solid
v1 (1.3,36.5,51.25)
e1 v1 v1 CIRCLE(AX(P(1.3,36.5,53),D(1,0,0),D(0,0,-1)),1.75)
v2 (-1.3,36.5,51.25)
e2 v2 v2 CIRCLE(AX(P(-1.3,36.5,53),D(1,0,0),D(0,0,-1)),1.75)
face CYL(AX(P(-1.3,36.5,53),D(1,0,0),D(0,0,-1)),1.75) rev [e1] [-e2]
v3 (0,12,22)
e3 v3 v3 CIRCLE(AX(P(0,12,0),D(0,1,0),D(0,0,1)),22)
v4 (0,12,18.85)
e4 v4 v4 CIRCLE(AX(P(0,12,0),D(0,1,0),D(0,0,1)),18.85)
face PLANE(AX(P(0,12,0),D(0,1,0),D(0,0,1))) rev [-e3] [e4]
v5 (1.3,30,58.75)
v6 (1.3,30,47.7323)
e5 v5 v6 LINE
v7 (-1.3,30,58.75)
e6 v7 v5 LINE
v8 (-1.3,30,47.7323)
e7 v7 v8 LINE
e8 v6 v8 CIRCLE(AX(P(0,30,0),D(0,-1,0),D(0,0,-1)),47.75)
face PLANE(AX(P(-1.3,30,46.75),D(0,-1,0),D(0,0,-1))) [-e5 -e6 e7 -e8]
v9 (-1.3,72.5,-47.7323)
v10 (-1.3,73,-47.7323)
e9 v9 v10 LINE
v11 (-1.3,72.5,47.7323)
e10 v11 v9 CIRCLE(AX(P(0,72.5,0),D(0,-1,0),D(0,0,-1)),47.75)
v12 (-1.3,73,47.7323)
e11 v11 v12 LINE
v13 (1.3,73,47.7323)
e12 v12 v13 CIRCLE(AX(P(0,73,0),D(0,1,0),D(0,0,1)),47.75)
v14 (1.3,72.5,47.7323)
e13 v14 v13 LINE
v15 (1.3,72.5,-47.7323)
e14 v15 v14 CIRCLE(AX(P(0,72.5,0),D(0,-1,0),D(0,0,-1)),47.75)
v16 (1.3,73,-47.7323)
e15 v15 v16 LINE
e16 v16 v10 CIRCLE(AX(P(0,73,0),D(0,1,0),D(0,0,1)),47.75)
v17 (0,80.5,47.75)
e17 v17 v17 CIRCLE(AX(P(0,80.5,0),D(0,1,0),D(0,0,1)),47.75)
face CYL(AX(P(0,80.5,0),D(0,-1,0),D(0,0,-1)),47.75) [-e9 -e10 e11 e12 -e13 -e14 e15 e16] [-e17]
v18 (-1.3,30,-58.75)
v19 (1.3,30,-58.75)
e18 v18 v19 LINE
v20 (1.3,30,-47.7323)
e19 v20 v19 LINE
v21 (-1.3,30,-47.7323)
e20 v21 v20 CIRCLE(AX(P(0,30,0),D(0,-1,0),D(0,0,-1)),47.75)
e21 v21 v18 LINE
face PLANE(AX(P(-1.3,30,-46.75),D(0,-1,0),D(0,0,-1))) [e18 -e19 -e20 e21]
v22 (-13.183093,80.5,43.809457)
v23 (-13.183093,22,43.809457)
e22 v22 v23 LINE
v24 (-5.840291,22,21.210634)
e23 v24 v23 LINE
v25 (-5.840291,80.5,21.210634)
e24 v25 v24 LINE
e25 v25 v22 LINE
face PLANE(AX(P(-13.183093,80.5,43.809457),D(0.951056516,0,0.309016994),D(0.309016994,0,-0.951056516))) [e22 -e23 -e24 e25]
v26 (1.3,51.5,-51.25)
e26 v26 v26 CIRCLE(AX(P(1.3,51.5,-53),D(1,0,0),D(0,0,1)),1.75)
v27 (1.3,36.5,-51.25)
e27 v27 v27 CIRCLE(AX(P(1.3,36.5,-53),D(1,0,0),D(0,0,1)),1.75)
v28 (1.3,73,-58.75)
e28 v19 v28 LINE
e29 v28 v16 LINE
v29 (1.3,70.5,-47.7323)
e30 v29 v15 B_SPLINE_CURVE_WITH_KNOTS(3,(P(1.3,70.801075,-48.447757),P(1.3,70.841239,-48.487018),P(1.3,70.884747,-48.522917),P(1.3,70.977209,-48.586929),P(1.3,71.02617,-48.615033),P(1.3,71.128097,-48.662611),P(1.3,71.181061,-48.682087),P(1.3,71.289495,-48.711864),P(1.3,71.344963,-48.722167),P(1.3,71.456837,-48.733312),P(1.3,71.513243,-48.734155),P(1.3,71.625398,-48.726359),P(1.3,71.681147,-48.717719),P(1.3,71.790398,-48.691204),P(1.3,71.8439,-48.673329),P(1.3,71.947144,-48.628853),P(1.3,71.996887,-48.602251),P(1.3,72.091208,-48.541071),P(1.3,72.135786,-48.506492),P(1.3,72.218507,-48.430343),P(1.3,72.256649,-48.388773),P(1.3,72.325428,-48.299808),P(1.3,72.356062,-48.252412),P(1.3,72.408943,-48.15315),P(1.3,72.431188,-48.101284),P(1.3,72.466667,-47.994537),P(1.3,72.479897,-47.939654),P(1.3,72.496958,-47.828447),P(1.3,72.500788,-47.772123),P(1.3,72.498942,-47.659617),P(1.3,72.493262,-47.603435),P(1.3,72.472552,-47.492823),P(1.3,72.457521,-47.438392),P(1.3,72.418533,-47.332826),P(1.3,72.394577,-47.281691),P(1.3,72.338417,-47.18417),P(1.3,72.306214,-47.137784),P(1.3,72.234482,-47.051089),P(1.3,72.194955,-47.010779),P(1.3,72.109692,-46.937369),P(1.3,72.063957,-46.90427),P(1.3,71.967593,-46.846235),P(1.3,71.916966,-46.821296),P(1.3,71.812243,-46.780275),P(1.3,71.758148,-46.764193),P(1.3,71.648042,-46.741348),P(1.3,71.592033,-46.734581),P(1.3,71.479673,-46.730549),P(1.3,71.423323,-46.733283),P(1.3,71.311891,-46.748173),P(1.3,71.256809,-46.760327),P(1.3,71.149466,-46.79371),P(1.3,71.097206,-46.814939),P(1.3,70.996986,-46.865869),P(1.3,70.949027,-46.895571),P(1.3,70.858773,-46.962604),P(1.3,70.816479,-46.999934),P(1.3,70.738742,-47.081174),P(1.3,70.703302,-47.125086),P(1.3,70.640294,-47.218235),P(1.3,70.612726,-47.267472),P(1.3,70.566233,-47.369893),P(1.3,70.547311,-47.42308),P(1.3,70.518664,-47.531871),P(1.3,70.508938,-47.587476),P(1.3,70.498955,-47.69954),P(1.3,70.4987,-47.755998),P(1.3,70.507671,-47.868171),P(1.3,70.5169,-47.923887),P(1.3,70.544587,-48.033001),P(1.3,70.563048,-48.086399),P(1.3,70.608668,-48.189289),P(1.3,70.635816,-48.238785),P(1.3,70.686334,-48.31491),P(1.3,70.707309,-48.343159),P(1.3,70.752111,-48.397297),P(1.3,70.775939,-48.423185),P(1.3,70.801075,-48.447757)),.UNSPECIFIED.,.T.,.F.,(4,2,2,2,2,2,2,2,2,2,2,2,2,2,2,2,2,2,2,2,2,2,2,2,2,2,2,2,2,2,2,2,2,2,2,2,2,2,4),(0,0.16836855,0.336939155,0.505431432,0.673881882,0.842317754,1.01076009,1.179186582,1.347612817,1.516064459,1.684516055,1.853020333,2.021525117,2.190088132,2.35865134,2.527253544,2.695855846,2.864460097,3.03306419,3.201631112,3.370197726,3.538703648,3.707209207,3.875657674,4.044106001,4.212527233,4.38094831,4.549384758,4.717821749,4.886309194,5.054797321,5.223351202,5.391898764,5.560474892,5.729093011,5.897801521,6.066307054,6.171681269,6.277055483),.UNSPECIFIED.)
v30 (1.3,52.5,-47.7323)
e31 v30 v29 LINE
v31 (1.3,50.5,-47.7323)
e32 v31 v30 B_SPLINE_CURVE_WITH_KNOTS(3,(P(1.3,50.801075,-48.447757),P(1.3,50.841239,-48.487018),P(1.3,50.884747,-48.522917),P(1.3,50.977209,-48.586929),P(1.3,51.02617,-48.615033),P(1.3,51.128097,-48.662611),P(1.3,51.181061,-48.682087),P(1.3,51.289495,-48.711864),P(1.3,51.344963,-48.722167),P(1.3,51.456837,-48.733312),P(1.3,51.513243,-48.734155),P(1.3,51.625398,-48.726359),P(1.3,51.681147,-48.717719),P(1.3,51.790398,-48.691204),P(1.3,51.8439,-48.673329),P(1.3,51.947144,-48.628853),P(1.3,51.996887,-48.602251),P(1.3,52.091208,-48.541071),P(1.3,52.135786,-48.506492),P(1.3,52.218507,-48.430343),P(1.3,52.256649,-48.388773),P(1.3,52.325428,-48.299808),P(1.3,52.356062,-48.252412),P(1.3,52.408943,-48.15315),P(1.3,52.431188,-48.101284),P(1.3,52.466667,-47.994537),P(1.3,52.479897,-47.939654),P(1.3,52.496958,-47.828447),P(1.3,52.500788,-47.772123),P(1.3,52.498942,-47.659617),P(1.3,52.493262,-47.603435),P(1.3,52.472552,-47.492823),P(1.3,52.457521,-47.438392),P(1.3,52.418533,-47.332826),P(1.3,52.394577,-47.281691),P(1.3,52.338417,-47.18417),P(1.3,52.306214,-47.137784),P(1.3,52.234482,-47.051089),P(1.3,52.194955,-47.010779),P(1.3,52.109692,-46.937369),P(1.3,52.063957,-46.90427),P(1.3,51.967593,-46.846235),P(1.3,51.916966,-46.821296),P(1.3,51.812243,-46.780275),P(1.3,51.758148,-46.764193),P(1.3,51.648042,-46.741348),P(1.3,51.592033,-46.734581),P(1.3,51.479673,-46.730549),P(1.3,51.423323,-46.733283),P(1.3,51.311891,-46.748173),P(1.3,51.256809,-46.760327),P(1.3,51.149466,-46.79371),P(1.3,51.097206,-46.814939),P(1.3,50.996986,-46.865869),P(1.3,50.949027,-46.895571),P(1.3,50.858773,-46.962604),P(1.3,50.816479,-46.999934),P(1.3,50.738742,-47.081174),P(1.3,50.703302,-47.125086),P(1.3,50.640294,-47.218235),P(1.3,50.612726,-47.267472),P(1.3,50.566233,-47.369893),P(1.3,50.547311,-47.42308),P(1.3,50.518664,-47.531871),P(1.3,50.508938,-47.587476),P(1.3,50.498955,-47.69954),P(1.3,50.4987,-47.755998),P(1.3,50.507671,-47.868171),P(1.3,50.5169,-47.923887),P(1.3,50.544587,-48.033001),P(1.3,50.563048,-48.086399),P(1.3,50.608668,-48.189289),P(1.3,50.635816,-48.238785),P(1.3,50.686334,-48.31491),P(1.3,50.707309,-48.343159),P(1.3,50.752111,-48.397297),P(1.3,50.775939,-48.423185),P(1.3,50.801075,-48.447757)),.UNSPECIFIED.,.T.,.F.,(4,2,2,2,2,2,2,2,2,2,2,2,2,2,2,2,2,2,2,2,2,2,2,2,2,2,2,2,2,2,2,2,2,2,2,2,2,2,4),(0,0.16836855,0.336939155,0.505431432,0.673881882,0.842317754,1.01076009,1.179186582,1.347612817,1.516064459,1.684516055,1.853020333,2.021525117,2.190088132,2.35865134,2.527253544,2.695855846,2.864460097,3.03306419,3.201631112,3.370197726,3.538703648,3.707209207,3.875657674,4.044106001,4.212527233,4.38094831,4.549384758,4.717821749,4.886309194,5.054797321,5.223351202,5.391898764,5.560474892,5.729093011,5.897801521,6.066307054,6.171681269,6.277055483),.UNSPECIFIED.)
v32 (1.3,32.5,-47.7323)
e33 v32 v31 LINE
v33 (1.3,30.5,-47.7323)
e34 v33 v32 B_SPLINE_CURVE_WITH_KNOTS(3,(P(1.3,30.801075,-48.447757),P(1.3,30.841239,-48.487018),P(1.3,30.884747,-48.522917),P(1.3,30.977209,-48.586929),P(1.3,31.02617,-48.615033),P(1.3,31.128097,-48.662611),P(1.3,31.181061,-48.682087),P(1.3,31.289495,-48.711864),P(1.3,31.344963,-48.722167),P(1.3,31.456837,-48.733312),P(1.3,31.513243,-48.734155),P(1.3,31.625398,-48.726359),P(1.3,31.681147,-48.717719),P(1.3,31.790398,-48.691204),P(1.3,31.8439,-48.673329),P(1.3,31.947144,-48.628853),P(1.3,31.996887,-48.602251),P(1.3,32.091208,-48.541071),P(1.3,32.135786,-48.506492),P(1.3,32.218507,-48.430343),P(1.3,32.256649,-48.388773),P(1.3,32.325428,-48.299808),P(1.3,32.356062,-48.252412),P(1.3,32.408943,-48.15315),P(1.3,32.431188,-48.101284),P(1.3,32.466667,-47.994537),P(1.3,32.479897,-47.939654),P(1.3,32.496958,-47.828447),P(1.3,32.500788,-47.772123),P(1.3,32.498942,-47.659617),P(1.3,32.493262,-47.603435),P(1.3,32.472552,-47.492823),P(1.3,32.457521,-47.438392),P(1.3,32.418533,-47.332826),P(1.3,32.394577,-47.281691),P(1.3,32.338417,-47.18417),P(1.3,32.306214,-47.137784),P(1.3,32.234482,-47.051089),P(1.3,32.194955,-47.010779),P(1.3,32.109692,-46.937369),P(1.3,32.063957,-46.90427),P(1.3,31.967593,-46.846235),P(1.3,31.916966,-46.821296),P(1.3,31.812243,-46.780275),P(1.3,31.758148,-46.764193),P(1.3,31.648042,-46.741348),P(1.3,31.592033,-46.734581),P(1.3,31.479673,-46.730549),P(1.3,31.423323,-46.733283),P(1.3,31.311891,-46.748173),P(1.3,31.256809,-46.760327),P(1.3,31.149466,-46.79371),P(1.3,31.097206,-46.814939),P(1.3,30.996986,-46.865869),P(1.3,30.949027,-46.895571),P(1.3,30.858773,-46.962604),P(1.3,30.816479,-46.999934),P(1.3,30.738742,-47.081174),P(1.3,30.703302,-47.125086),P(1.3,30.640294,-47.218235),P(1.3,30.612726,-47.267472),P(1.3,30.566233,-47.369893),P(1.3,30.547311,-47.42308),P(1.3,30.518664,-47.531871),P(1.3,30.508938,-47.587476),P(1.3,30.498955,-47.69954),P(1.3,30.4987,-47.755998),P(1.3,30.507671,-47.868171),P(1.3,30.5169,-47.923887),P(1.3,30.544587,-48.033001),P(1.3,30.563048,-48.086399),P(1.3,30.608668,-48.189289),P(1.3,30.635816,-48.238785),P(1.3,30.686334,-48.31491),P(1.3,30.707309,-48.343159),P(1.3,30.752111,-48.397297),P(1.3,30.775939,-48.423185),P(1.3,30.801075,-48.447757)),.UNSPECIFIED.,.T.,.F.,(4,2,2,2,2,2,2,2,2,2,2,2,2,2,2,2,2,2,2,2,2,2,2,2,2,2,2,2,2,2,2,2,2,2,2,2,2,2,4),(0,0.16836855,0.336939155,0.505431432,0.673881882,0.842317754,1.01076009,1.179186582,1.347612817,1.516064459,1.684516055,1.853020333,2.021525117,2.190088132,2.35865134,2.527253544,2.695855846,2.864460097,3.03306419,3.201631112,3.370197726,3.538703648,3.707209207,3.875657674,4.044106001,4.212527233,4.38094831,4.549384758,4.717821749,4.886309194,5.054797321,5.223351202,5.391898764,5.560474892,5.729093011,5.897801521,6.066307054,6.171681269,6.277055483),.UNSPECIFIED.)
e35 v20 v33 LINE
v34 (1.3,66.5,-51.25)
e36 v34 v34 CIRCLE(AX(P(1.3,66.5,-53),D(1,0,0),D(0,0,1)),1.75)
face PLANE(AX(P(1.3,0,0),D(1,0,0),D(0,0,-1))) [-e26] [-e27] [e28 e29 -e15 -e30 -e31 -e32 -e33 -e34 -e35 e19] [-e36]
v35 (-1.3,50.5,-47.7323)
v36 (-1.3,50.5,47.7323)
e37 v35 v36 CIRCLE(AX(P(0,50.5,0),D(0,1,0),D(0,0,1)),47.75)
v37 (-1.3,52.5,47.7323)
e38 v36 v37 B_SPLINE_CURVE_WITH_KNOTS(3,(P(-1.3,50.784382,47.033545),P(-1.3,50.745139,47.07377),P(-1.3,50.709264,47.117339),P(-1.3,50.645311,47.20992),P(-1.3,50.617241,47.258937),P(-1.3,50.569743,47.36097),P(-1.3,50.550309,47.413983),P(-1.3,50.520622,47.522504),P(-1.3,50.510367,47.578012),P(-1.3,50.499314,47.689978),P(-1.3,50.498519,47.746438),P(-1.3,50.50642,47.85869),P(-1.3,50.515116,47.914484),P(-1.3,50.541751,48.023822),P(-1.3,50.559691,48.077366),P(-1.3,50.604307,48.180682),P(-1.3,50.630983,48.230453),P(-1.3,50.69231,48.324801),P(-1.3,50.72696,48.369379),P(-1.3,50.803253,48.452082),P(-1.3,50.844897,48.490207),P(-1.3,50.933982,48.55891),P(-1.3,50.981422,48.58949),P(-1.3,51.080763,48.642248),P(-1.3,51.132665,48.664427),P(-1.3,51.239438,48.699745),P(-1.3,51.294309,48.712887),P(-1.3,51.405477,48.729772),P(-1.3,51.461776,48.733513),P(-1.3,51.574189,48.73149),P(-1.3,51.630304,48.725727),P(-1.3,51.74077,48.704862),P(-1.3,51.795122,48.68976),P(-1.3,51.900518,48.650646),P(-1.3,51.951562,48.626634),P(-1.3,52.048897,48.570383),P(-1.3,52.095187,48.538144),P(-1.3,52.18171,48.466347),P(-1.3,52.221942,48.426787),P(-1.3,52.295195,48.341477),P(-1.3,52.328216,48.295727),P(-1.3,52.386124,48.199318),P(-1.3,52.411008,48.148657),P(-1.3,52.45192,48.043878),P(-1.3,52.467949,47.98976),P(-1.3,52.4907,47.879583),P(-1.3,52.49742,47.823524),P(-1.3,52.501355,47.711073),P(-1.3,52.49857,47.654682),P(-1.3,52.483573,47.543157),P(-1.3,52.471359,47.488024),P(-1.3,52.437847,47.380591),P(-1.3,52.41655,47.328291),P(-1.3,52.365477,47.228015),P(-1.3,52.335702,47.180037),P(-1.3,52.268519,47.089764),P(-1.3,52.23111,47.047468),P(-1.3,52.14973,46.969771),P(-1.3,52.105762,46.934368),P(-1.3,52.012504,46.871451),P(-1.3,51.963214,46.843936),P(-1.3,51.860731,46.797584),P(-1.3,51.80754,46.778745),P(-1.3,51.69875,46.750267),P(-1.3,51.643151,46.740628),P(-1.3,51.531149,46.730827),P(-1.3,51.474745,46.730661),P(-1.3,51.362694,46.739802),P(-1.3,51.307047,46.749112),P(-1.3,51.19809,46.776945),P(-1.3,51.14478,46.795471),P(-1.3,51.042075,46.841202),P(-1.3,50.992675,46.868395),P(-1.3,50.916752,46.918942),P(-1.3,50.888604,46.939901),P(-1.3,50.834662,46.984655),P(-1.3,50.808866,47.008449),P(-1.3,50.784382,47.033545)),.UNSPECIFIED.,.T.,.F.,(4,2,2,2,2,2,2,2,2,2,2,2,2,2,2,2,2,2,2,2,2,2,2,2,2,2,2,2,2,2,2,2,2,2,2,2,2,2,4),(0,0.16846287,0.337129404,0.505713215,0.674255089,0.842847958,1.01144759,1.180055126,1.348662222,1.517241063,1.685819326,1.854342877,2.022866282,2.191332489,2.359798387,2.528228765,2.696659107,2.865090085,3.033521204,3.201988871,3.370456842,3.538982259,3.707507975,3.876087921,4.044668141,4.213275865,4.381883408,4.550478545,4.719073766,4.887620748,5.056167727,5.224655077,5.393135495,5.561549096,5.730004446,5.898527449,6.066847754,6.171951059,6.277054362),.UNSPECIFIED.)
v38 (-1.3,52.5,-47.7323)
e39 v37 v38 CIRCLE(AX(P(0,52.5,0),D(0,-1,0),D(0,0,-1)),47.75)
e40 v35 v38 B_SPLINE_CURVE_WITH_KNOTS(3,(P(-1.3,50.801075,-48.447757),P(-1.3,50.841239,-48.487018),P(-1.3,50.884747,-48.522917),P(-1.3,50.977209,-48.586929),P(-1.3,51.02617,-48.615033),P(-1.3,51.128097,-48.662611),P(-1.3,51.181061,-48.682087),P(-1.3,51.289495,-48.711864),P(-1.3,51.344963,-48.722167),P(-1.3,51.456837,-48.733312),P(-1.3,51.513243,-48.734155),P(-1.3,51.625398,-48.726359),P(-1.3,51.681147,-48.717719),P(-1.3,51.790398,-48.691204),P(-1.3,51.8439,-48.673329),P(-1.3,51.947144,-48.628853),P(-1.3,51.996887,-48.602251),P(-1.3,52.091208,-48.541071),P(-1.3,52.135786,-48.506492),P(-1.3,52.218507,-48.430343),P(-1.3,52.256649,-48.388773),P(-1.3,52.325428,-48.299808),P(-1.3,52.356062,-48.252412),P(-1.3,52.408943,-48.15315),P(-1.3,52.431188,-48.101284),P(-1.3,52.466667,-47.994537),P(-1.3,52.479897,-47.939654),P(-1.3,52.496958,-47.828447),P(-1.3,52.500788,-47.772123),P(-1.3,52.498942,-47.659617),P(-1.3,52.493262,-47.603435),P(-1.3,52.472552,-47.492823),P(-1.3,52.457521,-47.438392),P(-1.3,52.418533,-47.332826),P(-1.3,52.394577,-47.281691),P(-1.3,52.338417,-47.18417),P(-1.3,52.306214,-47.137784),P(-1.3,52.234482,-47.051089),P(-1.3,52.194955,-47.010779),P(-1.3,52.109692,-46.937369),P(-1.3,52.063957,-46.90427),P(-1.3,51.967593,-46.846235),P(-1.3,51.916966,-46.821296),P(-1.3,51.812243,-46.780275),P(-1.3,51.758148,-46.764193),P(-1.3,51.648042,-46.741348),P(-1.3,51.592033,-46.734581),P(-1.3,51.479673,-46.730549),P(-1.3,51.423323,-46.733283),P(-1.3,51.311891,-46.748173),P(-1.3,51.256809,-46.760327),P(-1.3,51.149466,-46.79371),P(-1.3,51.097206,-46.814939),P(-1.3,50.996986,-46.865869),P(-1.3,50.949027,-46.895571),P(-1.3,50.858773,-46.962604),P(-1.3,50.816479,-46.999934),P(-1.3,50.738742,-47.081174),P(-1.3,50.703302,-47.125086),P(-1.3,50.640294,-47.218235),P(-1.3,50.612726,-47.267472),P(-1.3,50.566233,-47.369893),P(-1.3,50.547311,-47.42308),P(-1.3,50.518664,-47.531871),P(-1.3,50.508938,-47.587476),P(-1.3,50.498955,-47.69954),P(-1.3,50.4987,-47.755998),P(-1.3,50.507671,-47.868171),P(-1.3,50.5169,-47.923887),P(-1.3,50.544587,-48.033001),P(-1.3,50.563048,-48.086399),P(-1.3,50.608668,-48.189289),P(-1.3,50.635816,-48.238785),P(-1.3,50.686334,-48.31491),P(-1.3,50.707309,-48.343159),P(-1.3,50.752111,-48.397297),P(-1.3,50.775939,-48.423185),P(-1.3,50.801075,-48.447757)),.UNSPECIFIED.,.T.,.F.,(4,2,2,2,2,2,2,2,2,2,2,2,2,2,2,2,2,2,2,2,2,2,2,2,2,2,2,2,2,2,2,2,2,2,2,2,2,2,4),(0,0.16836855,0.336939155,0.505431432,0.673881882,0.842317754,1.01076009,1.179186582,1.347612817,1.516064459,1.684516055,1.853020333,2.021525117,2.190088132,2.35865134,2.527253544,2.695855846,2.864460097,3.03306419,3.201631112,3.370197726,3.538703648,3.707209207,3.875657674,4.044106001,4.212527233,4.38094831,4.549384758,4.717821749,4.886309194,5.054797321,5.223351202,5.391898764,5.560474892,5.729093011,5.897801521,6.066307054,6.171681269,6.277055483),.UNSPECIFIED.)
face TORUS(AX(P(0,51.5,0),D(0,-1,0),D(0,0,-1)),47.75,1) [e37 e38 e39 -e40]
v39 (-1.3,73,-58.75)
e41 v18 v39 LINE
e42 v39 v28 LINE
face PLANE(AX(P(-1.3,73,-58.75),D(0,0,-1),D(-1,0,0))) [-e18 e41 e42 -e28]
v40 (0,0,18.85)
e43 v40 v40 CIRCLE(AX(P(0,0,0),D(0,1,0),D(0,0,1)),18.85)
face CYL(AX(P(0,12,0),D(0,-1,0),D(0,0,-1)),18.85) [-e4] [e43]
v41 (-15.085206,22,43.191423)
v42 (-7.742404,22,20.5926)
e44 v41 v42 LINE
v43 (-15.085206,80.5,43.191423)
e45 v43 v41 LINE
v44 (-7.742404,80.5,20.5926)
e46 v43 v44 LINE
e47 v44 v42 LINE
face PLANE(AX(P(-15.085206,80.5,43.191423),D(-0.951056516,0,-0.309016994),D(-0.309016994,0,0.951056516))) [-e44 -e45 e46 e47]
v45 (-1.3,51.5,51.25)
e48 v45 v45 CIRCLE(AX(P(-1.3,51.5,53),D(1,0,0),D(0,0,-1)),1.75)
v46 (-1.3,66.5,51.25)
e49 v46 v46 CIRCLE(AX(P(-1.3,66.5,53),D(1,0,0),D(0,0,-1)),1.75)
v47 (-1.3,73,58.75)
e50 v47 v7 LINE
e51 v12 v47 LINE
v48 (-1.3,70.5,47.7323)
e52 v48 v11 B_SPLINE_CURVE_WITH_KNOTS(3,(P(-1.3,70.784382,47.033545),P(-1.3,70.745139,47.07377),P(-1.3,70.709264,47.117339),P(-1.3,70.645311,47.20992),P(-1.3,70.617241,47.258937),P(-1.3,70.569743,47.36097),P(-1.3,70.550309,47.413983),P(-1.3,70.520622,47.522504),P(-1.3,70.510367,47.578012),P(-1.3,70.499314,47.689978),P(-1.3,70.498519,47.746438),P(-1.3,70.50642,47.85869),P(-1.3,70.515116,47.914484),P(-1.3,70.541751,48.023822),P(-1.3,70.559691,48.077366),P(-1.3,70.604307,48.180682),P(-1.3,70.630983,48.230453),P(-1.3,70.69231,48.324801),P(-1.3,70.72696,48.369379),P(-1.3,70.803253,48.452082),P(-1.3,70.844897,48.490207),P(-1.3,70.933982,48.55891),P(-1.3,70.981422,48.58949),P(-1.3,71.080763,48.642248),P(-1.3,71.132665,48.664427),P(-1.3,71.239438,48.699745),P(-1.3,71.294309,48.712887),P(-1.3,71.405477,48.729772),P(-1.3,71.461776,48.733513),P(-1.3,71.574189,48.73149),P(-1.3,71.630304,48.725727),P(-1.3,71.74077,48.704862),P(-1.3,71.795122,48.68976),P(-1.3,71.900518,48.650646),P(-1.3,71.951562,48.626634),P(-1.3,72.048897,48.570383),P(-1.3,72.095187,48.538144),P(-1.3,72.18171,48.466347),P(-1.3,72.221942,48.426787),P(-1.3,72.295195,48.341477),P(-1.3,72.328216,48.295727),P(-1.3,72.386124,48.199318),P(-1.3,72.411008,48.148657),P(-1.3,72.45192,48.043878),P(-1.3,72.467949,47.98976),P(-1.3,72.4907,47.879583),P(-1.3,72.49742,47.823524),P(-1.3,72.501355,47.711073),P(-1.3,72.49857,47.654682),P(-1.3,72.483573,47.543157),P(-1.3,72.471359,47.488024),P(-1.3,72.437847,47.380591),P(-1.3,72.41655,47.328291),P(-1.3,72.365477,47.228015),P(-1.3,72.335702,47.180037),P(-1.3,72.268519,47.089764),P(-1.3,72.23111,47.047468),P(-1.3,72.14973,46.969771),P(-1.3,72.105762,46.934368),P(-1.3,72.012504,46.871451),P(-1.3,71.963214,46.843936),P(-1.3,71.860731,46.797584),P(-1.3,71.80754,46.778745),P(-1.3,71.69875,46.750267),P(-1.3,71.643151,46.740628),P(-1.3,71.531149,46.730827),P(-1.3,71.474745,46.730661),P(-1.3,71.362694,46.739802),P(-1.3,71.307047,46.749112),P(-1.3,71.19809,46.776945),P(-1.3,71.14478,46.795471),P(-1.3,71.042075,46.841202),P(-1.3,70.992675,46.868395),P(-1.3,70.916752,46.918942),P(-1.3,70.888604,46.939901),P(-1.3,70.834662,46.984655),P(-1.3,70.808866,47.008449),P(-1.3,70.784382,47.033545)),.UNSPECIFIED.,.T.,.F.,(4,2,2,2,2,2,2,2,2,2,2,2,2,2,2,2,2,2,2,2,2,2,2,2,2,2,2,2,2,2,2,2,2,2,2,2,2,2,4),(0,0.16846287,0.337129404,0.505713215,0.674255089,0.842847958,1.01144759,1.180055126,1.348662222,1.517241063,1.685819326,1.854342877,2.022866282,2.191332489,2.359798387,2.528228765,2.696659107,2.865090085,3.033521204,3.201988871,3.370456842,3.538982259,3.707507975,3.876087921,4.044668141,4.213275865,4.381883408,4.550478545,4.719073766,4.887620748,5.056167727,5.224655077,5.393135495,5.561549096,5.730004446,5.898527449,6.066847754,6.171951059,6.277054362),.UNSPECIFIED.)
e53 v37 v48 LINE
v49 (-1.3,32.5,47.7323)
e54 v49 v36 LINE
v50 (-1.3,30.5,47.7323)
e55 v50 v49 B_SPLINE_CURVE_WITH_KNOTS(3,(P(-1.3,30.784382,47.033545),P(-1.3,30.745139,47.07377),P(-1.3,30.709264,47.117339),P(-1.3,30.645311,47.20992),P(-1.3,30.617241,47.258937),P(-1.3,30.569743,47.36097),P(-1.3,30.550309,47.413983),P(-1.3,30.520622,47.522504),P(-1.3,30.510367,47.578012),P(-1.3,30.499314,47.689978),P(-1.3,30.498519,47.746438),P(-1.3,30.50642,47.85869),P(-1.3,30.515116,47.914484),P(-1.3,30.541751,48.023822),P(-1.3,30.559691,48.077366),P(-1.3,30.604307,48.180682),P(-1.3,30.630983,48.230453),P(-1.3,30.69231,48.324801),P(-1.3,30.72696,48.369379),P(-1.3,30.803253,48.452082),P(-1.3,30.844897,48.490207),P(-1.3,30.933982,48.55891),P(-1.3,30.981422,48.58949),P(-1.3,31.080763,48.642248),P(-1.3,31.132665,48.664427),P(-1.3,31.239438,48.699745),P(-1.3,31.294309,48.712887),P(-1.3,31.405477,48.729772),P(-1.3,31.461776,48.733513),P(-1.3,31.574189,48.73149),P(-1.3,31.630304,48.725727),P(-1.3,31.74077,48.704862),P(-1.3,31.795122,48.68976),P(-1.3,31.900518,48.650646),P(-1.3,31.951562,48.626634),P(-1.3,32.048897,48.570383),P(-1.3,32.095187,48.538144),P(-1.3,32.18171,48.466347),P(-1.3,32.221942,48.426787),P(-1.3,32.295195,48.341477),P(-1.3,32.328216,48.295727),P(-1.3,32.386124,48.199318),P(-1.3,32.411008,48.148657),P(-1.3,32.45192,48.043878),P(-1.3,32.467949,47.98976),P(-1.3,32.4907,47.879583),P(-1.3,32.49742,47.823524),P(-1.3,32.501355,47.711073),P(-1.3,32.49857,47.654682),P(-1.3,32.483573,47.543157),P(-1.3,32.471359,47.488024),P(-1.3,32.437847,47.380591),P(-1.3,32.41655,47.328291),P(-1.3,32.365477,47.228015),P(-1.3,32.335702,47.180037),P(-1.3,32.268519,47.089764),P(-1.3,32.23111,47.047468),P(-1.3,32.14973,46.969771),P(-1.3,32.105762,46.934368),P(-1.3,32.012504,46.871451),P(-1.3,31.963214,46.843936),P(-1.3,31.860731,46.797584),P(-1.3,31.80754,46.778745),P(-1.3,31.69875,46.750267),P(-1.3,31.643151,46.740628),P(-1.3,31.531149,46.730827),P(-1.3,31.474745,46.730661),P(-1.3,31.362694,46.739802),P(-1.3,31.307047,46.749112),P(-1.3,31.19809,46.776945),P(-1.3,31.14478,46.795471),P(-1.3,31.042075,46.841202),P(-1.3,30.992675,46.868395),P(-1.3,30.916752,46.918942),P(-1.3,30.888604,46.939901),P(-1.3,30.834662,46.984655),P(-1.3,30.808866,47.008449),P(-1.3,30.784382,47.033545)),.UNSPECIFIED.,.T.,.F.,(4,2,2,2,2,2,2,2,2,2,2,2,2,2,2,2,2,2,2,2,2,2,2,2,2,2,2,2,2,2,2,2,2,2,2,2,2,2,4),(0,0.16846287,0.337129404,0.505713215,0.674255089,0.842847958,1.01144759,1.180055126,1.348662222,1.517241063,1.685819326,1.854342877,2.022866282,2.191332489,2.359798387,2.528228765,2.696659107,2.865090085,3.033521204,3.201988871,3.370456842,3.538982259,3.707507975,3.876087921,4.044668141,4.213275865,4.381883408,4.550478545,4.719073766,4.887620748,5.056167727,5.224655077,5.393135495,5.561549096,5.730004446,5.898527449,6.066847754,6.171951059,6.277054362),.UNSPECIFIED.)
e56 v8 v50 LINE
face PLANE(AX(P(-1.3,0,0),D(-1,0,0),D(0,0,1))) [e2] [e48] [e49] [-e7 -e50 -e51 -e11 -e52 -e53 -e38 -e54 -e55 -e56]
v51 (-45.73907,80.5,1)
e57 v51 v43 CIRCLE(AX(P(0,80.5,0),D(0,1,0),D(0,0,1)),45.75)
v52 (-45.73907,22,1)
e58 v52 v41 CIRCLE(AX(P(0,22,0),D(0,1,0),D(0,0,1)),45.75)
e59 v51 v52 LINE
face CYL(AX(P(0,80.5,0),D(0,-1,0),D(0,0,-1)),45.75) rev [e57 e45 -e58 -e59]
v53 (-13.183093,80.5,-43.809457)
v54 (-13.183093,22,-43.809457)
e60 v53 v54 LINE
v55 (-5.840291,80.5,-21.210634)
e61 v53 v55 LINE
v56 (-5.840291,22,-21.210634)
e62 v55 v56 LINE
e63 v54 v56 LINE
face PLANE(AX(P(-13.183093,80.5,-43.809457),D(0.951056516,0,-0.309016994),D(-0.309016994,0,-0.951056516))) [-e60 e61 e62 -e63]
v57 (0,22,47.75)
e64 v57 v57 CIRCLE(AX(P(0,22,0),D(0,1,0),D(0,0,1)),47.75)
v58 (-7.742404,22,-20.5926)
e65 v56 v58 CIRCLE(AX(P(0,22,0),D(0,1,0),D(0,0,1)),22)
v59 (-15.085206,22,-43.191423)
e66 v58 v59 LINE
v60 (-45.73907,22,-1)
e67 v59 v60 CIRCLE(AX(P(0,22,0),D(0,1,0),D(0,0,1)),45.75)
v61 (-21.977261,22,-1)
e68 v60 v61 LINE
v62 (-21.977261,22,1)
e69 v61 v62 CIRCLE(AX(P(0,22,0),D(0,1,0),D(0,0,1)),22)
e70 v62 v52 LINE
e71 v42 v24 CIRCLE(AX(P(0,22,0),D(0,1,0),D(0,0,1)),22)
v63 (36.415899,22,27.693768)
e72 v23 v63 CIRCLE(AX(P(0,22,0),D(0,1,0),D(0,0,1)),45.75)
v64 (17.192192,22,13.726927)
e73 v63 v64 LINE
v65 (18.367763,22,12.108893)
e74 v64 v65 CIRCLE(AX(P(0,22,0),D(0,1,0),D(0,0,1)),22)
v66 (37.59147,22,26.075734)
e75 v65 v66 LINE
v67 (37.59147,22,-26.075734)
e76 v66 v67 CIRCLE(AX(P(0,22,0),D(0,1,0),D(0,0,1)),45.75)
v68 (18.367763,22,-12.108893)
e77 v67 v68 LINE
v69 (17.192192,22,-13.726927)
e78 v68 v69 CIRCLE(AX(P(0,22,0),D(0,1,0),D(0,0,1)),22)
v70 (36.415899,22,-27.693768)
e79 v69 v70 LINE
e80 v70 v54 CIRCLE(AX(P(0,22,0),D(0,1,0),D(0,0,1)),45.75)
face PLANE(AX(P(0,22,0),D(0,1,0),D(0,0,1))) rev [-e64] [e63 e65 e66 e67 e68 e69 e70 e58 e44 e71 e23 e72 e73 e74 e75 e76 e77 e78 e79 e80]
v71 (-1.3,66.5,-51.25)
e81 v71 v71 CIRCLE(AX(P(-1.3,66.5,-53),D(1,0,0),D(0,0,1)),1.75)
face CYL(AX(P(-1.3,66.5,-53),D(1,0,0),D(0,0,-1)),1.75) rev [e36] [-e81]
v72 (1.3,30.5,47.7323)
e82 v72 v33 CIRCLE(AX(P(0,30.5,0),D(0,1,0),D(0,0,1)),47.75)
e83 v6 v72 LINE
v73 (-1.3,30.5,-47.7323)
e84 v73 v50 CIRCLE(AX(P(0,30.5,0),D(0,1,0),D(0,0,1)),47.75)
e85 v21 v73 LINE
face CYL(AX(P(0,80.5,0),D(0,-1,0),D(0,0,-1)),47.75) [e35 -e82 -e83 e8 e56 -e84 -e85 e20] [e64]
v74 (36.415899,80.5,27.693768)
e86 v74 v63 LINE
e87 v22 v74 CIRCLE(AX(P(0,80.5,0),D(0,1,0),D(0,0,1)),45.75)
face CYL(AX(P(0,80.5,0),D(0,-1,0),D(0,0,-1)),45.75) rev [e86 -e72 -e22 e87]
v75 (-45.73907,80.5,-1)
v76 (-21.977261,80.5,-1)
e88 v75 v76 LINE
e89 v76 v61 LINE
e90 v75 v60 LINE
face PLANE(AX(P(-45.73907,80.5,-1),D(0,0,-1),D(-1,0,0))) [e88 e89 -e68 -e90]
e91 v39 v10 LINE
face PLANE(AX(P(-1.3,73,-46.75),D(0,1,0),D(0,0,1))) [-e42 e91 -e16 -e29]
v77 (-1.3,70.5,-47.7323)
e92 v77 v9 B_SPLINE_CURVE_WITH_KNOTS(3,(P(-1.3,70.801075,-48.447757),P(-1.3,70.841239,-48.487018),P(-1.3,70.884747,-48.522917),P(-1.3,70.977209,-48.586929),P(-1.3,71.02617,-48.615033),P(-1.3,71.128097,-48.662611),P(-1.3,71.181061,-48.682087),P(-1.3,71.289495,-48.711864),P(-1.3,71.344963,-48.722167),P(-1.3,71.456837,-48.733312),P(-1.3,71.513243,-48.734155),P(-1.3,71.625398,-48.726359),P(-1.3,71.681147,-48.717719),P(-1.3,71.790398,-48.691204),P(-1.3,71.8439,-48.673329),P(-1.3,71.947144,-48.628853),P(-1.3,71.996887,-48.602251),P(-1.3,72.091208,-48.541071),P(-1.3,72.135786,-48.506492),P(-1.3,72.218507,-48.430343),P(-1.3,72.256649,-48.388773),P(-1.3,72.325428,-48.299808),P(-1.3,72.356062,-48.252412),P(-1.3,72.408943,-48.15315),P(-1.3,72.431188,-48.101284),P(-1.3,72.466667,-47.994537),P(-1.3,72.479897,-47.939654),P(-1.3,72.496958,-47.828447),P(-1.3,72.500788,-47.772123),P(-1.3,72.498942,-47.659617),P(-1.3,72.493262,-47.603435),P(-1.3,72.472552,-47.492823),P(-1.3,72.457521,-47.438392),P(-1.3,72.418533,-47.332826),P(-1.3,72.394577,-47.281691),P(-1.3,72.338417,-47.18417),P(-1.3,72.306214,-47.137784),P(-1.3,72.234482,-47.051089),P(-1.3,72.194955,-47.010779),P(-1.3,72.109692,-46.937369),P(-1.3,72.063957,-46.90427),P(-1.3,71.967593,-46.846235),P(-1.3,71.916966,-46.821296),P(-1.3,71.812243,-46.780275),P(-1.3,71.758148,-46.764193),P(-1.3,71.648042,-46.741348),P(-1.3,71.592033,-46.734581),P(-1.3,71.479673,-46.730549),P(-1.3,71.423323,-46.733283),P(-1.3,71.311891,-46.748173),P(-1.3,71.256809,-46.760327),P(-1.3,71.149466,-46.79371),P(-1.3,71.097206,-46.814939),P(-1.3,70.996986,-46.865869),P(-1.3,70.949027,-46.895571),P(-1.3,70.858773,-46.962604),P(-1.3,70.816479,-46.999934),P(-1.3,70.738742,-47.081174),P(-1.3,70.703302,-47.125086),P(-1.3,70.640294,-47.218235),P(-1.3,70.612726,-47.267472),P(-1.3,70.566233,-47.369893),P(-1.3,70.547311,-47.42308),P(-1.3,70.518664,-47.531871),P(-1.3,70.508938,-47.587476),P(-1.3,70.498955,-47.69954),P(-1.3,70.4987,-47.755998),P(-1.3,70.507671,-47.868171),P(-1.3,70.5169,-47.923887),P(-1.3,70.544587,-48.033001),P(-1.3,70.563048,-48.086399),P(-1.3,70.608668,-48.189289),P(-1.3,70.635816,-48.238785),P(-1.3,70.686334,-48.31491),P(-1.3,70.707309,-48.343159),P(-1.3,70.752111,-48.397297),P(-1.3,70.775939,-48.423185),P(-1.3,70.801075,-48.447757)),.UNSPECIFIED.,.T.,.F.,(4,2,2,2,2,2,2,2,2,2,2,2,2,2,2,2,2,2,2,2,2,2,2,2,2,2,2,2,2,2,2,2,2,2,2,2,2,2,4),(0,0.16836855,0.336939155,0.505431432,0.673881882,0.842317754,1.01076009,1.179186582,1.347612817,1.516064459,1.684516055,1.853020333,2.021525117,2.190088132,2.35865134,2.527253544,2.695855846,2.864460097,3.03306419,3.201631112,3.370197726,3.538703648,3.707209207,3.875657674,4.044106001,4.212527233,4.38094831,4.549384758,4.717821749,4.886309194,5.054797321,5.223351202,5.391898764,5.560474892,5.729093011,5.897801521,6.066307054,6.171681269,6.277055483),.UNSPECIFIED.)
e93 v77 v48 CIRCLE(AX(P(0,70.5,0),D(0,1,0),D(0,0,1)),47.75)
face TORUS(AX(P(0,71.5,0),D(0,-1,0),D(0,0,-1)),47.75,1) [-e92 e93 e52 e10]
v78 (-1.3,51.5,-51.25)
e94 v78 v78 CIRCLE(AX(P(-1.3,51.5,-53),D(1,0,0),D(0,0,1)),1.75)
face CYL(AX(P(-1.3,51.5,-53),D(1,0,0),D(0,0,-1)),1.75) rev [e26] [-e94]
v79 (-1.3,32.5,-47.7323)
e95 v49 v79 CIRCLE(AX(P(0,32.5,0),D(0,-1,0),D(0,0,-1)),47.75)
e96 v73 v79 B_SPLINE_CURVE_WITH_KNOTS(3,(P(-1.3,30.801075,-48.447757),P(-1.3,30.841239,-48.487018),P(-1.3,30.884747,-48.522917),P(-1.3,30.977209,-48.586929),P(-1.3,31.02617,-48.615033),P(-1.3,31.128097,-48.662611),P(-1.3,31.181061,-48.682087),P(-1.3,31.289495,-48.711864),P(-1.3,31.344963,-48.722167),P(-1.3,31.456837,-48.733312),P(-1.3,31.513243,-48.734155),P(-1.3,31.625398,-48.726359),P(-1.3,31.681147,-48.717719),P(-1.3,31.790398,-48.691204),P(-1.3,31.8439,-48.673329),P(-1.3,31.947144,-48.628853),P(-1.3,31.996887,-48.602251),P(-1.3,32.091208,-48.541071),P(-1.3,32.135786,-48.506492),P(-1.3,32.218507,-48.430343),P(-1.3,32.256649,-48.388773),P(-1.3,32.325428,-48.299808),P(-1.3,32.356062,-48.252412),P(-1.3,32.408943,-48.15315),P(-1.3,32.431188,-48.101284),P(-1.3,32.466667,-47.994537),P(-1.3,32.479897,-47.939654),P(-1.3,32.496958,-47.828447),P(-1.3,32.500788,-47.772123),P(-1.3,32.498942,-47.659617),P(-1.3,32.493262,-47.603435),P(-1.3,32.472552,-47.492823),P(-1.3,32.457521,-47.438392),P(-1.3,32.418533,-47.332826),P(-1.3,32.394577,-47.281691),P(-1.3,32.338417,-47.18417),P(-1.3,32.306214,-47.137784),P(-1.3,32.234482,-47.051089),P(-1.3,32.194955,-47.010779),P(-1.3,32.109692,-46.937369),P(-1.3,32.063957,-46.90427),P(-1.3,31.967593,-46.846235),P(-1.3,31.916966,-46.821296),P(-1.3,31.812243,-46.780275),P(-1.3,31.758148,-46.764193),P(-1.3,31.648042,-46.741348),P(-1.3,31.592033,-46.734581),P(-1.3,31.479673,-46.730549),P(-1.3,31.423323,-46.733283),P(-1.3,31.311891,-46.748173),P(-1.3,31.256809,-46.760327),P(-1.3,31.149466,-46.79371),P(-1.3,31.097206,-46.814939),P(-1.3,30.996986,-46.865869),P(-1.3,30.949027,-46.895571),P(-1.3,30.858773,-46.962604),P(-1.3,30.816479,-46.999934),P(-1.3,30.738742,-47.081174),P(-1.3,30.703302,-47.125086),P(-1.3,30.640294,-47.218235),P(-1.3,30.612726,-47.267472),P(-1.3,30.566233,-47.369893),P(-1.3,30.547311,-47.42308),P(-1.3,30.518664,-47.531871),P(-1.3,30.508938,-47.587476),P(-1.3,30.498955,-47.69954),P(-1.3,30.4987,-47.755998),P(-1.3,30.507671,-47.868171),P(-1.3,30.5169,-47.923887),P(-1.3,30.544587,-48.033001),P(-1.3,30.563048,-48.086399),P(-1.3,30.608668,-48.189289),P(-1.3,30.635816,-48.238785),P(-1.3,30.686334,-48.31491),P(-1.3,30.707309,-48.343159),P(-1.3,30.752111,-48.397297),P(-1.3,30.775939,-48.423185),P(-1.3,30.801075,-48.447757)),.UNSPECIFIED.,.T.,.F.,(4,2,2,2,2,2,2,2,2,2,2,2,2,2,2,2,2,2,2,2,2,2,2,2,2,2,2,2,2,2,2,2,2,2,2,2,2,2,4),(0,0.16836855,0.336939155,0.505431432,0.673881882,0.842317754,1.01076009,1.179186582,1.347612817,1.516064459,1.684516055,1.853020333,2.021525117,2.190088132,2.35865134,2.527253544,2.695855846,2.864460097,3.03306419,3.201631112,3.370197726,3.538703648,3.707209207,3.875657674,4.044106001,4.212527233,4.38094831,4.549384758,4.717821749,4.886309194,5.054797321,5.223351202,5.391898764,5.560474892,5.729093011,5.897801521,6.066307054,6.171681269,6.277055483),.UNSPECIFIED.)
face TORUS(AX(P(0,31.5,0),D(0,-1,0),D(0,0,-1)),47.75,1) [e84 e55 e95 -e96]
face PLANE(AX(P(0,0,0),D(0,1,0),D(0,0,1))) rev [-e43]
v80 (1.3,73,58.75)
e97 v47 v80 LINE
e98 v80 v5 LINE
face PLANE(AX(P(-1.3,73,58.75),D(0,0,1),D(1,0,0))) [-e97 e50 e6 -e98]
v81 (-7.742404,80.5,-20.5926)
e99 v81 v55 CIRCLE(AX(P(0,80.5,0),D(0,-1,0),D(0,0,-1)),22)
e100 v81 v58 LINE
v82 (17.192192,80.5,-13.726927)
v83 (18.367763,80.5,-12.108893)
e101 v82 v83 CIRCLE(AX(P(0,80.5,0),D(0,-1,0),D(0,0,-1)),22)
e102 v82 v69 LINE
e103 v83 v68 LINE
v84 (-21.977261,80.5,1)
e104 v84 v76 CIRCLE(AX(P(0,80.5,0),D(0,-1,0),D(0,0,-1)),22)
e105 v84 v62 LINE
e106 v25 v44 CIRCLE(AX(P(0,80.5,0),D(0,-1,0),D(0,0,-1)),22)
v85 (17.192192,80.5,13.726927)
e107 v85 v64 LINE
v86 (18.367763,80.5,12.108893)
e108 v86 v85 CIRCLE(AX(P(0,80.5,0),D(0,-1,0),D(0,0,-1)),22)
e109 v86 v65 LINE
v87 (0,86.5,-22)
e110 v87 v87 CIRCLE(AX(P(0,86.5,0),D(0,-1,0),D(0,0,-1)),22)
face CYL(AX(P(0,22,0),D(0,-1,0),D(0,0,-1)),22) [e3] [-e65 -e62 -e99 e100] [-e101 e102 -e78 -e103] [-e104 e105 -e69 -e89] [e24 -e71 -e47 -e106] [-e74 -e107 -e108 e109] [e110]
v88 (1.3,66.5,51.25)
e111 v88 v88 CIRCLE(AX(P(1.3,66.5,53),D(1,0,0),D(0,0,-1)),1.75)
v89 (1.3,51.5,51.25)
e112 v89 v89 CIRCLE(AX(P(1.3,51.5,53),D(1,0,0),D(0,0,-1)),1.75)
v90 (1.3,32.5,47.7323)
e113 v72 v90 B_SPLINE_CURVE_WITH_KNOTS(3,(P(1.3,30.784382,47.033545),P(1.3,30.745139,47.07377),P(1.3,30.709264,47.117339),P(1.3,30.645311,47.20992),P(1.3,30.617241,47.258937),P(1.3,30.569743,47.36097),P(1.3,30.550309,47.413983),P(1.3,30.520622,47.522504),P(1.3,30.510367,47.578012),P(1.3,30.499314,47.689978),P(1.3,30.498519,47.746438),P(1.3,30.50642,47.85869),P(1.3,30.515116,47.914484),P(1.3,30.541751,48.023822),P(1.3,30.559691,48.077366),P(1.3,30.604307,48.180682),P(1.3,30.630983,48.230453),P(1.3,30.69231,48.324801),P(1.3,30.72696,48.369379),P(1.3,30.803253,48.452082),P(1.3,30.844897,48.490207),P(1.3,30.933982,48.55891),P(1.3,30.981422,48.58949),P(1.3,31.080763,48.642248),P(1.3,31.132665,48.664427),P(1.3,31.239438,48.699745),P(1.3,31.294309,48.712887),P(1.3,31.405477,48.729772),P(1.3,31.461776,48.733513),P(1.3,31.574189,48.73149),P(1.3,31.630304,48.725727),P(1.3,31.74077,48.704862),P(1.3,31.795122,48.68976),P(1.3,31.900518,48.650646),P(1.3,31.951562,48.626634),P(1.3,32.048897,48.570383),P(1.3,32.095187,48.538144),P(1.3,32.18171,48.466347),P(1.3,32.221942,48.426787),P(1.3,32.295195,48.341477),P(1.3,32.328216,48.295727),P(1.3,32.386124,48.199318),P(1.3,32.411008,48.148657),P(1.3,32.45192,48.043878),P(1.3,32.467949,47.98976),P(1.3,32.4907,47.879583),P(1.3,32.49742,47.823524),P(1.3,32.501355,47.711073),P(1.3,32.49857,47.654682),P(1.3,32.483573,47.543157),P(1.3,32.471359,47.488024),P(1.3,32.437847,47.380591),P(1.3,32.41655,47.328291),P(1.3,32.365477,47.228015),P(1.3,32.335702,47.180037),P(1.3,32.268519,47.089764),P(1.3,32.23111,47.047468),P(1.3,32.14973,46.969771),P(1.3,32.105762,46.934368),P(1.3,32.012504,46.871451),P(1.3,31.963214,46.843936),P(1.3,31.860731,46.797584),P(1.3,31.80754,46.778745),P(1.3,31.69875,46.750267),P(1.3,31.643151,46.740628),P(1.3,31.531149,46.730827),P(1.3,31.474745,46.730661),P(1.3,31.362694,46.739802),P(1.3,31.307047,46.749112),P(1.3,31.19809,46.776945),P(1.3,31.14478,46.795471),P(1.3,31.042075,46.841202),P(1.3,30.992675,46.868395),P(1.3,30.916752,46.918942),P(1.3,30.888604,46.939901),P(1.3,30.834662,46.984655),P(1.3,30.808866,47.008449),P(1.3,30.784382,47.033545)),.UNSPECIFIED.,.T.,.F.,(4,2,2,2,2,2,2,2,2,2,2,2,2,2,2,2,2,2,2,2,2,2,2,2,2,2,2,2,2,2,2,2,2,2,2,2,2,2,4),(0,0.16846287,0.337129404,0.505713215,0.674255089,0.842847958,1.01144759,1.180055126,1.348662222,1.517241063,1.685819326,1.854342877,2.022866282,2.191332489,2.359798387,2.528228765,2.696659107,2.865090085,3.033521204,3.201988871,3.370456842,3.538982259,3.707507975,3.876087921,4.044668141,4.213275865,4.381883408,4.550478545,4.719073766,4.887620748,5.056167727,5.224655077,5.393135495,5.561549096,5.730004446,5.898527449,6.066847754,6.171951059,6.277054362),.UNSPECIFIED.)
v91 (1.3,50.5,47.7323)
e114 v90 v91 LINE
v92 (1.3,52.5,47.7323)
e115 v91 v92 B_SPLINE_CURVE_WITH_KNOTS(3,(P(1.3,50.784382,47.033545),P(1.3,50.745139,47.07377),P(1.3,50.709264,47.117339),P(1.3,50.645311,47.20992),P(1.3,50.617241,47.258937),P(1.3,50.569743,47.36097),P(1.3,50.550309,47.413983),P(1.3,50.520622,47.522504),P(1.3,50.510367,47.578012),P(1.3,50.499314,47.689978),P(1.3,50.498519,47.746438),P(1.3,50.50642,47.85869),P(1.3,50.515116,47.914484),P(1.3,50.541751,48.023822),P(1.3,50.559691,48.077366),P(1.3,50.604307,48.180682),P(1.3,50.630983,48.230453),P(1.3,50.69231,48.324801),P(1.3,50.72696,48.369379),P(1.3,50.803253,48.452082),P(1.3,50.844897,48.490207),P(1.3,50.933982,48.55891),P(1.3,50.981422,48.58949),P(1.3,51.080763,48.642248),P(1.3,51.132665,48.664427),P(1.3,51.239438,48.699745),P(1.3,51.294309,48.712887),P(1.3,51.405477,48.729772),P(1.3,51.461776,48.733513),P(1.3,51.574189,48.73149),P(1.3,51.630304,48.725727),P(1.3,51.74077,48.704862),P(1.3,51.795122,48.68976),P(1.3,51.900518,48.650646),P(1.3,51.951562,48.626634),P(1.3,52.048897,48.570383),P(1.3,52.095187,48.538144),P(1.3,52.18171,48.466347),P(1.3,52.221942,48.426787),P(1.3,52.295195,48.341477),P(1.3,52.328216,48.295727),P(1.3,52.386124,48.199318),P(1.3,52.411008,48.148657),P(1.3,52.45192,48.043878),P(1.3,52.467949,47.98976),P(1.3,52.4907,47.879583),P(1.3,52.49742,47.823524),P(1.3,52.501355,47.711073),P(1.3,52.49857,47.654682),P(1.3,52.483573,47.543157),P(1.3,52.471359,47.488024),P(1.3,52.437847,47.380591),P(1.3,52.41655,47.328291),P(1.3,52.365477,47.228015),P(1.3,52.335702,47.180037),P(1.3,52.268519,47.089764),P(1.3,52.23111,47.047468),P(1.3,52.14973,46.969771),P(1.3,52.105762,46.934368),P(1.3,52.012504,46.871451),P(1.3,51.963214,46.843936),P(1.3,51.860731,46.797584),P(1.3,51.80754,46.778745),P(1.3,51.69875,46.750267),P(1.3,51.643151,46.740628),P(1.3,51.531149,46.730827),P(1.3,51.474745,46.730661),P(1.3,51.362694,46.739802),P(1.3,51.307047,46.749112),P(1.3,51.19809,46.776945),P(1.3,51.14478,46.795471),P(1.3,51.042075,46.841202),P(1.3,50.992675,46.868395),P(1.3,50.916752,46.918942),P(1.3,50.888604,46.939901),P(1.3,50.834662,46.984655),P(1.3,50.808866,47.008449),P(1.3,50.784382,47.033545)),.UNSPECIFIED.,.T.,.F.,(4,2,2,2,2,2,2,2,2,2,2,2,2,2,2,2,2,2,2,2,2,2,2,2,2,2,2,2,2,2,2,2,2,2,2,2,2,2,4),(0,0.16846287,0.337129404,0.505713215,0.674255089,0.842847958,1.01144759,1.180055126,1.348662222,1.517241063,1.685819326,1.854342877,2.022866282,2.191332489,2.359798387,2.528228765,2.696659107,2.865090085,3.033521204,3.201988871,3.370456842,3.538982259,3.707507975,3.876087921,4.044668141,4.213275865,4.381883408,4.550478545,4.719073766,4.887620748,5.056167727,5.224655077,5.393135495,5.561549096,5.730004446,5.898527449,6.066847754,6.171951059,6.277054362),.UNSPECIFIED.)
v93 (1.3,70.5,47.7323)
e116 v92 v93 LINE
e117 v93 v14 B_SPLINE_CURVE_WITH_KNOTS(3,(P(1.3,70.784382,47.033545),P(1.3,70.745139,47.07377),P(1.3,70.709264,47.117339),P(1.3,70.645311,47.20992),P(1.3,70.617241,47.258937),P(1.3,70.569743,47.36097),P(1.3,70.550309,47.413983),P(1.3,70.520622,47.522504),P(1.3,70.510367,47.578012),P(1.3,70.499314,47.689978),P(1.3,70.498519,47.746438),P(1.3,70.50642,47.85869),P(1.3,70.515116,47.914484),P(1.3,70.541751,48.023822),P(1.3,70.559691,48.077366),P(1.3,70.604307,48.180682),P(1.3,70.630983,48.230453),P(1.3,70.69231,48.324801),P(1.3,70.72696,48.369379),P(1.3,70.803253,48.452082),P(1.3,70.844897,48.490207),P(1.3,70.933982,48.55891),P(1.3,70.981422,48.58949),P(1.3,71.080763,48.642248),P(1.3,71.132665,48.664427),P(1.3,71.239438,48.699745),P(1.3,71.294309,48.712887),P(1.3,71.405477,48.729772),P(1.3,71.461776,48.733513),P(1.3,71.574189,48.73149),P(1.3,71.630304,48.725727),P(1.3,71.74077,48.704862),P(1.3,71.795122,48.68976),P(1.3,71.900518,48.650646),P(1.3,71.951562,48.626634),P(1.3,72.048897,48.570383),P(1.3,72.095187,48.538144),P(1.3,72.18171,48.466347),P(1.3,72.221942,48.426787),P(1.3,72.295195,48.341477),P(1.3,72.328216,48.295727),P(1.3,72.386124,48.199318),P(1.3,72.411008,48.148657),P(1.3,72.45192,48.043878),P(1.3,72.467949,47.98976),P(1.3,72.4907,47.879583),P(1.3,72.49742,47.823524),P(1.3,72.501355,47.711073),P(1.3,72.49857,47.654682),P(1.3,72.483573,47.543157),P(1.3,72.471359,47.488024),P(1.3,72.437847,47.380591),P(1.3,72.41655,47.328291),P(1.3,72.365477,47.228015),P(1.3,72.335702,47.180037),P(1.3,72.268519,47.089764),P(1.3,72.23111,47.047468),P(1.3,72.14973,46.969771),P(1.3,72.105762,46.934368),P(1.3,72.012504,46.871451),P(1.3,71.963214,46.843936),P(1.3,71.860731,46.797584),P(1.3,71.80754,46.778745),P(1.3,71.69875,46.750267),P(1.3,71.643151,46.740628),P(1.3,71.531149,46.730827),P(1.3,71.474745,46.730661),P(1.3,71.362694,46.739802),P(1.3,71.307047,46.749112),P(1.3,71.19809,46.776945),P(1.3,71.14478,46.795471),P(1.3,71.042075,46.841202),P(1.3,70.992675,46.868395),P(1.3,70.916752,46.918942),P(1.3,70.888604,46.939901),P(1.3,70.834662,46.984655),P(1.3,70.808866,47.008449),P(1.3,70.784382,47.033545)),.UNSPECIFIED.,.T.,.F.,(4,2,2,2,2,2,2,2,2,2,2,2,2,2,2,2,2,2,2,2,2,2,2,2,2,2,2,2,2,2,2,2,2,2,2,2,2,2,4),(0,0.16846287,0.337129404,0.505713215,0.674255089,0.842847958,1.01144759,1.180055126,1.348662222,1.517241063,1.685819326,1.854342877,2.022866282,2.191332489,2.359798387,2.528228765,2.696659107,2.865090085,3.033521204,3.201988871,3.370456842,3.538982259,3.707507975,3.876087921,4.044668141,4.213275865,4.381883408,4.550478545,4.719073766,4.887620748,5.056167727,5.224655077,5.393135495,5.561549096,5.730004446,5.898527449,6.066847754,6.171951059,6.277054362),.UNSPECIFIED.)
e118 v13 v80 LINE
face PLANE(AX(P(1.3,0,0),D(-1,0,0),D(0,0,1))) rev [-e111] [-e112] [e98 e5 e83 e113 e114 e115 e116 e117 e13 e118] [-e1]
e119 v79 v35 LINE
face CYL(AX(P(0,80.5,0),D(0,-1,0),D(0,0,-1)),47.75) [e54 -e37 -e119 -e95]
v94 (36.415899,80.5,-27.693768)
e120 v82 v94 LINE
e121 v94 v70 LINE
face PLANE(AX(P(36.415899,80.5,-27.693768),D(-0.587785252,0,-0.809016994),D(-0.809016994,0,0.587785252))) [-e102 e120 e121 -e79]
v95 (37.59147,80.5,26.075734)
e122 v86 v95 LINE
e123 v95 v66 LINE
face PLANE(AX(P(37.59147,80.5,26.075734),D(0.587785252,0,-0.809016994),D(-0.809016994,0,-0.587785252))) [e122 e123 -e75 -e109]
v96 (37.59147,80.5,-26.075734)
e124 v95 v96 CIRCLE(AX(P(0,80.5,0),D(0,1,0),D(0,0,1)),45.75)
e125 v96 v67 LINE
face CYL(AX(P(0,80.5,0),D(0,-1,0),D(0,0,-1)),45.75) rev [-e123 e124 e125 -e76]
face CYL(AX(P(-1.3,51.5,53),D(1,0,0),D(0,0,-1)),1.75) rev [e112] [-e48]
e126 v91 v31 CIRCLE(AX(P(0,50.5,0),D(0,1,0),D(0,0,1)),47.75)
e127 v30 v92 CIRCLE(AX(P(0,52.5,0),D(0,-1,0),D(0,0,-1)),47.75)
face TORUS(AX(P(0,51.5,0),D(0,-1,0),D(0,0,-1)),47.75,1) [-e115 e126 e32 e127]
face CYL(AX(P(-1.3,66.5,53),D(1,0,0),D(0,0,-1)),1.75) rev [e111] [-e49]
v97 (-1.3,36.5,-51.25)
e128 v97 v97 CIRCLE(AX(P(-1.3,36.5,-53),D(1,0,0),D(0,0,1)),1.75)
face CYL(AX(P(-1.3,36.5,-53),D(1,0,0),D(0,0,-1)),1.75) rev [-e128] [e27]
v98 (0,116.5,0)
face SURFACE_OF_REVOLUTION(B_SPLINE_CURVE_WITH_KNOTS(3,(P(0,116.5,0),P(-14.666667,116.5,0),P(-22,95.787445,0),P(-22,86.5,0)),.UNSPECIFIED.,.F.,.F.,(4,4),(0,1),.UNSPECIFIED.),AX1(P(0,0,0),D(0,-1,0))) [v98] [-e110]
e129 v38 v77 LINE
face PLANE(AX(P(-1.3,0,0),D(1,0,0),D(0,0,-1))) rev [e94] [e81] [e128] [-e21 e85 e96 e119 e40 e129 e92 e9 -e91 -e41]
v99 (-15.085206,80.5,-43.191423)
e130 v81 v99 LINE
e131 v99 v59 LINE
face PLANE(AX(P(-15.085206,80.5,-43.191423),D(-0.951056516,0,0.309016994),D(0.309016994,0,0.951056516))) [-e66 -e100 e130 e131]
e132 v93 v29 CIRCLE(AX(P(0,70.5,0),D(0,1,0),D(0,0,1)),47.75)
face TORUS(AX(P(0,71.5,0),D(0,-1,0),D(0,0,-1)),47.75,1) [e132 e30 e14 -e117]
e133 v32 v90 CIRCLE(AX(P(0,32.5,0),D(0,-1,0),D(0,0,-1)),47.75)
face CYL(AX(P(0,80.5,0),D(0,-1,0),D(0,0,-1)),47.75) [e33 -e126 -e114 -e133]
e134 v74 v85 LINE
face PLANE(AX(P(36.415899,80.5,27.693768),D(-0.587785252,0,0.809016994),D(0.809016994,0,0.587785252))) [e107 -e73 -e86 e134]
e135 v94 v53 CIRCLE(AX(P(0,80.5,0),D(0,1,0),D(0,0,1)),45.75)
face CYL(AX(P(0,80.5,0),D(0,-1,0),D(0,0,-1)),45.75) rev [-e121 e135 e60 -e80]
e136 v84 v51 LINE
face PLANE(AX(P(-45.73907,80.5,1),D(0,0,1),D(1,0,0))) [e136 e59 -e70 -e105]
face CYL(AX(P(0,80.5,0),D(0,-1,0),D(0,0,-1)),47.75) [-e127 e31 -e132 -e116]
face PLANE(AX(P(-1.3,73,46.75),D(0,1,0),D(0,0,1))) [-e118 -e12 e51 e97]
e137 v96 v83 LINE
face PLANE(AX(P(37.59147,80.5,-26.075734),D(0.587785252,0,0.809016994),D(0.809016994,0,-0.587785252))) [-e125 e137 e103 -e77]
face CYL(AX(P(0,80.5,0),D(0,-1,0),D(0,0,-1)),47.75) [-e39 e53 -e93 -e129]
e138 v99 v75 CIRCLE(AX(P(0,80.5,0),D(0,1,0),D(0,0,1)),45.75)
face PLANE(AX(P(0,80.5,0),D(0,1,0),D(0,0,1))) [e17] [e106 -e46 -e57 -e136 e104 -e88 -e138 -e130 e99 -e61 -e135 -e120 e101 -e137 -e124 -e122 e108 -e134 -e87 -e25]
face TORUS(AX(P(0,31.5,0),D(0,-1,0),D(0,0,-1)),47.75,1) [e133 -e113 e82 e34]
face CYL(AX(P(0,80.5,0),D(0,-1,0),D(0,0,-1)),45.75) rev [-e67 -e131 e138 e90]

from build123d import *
from build123d.topology import SkipClean

# Parameters (mm, degrees)
SKETCH1_R                = 18.85
BOSS_EXTRUDE1_DEPTH      = 12
SKETCH2_R                = 22
BOSS_EXTRUDE2_DEPTH      = 10
SKETCH3_R                = 47.75
BOSS_EXTRUDE3_DEPTH      = 58.5
BOSS_EXTRUDE5_DEPTH      = 1.3
BOSS_EXTRUDE5_DEPTH_BACK = 1.3
SKETCH6_W                = 12
SKETCH6_H                = 43
SKETCH6_R                = 1.75


with BuildPart() as part:
    # Sketch1 → Boss-Extrude1 (new body)
    with BuildSketch(Plane(origin=(0, 0, 0), x_dir=(1, 0, 0), z_dir=(0, 1, 0))):
        with Locations(Location((0, 0, 0), (0, 0, 270))):
            Circle(SKETCH1_R)
    extrude(amount=BOSS_EXTRUDE1_DEPTH)

    # Sketch2 → Boss-Extrude2 (add)
    with BuildSketch(Plane(origin=(0, 12, 0), x_dir=(1, 0, 0), z_dir=(0, 1, 0))):
        with Locations(Location((0, 0, 0), (0, 0, 270))):
            Circle(SKETCH2_R)
    extrude(amount=BOSS_EXTRUDE2_DEPTH)

    # Sketch3 → Boss-Extrude3 (add)
    with SkipClean():  # the faces are left unmerged after this step: merging them gives an invalid solid
        with BuildSketch(Plane(origin=(0, 22, 0), x_dir=(1, 0, 0), z_dir=(0, 1, 0))):
            with Locations(Location((0, 0, 0), (0, 0, 270))):
                Circle(SKETCH3_R)
            with BuildLine():
                Line((-13.183093338, 43.809457313), (-5.840290615, 21.210634256))
                ThreePointArc((-5.840290615, 21.210634256), (6.798373876, 20.923243358), (17.192192367, 13.726926882))
                Line((17.192192367, 13.726926882), (36.415899468, 27.693767637))
                ThreePointArc((36.415899468, 27.693767637), (14.137527493, 43.510835621), (-13.183093338, 43.809457313))
            make_face(mode=Mode.SUBTRACT)
            with BuildLine():
                Line((-45.739069733, 1), (-21.977260976, 1))
                ThreePointArc((-21.977260976, 1), (-17.798373876, 12.93127555), (-7.742403648, 20.592600267))
                Line((-7.742403648, 20.592600267), (-15.085206371, 43.191423324))
                ThreePointArc((-15.085206371, 43.191423324), (-37.012527493, 26.891175292), (-45.739069733, 1))
            make_face(mode=Mode.SUBTRACT)
            with BuildLine():
                Line((-45.739069733, -1), (-21.977260976, -1))
                ThreePointArc((-21.977260976, -1), (-17.798373876, -12.93127555), (-7.742403648, -20.592600267))
                Line((-7.742403648, -20.592600267), (-15.085206371, -43.191423324))
                ThreePointArc((-15.085206371, -43.191423324), (-37.012527493, -26.891175292), (-45.739069733, -1))
            make_face(mode=Mode.SUBTRACT)
            with BuildLine():
                Line((37.591469973, 26.075733648), (18.367762872, 12.108892893))
                ThreePointArc((18.367762872, 12.108892893), (22, 0), (18.367762872, -12.108892893))
                Line((18.367762872, -12.108892893), (37.591469973, -26.075733648))
                ThreePointArc((37.591469973, -26.075733648), (45.75, 0), (37.591469973, 26.075733648))
            make_face(mode=Mode.SUBTRACT)
            with BuildLine():
                Line((36.415899468, -27.693767637), (17.192192367, -13.726926882))
                ThreePointArc((17.192192367, -13.726926882), (6.798373876, -20.923243358), (-5.840290615, -21.210634256))
                Line((-5.840290615, -21.210634256), (-13.183093338, -43.809457313))
                ThreePointArc((-13.183093338, -43.809457313), (14.137527493, -43.510835621), (36.415899468, -27.693767637))
            make_face(mode=Mode.SUBTRACT)
        extrude(amount=BOSS_EXTRUDE3_DEPTH)

    # Revolve1: read off the stored shape, not the designer's step
    # Revolve1 outline → Revolve1 (revolve)
    with SkipClean():  # the faces are left unmerged after this step: merging them gives an invalid solid
        with BuildSketch(Plane.XY):
            with BuildLine():
                ThreePointArc((47.75, 70.5), (48.75, 71.5), (47.75, 72.5))
                Line((47.75, 72.5), (47.75, 70.5))
            make_face()
            with BuildLine():
                ThreePointArc((47.75, 50.5), (48.75, 51.5), (47.75, 52.5))
                Line((47.75, 52.5), (47.75, 50.5))
            make_face()
            with BuildLine():
                ThreePointArc((47.75, 30.5), (48.75, 31.5), (47.75, 32.5))
                Line((47.75, 32.5), (47.75, 30.5))
            make_face()
        revolve(axis=Axis((0, 0, 0), (0, 1, 0)))

    # Revolve1 2 outline → Revolve1 2 (revolve)
    with SkipClean():  # the faces are left unmerged after this step: merging them gives an invalid solid
        with BuildSketch(Plane.XY):
            with BuildLine():
                add(Edge.make_bspline(
                    [(0, 116.5), (14.666666667, 116.5), (22, 95.787444652), (22, 86.5)],
                    knots=[0, 0, 0, 0, 1, 1, 1, 1], degree=3))
                Line((0, 116.5), (0, 80.5))
                Line((0, 80.5), (22.0000001, 80.5))
                Line((22.0000001, 80.5), (22, 86.5))
            make_face()
        revolve(axis=Axis((0, 0, 0), (0, 1, 0)))

    # Sketch6 → Boss-Extrude5 (add, two sides: drawn at the far end of the back side and taken through both)
    # profile 1 of 2: a face of its own
    with SkipClean():  # the faces are left unmerged after this step: merging them gives an invalid solid
        with BuildSketch(Plane(origin=(0, 0, 0), x_dir=(0, 0, -1), z_dir=(1, 0, 0)).offset(-BOSS_EXTRUDE5_DEPTH_BACK)):
            with Locations((-52.75, 51.5)):
                Rectangle(SKETCH6_W, SKETCH6_H)
            with Locations((-53, 51.5)):
                Circle(SKETCH6_R, mode=Mode.SUBTRACT)
            with Locations((-53, 66.5)):
                Circle(SKETCH6_R, mode=Mode.SUBTRACT)
            with Locations((-53, 36.5)):
                Circle(SKETCH6_R, mode=Mode.SUBTRACT)
        # profile 2 of 2: a face of its own
        with BuildSketch(Plane(origin=(0, 0, 0), x_dir=(0, 0, -1), z_dir=(1, 0, 0)).offset(-BOSS_EXTRUDE5_DEPTH_BACK)):
            with Locations((52.75, 51.5)):
                Rectangle(SKETCH6_W, SKETCH6_H)
            with Locations(Location((53, 51.5, 0), (0, 0, 180))):
                Circle(SKETCH6_R, mode=Mode.SUBTRACT)
            with Locations(Location((53, 36.5, 0), (0, 0, 180))):
                Circle(SKETCH6_R, mode=Mode.SUBTRACT)
            with Locations(Location((53, 66.5, 0), (0, 0, 180))):
                Circle(SKETCH6_R, mode=Mode.SUBTRACT)
        extrude(amount=BOSS_EXTRUDE5_DEPTH + BOSS_EXTRUDE5_DEPTH_BACK)


solid = part.part
